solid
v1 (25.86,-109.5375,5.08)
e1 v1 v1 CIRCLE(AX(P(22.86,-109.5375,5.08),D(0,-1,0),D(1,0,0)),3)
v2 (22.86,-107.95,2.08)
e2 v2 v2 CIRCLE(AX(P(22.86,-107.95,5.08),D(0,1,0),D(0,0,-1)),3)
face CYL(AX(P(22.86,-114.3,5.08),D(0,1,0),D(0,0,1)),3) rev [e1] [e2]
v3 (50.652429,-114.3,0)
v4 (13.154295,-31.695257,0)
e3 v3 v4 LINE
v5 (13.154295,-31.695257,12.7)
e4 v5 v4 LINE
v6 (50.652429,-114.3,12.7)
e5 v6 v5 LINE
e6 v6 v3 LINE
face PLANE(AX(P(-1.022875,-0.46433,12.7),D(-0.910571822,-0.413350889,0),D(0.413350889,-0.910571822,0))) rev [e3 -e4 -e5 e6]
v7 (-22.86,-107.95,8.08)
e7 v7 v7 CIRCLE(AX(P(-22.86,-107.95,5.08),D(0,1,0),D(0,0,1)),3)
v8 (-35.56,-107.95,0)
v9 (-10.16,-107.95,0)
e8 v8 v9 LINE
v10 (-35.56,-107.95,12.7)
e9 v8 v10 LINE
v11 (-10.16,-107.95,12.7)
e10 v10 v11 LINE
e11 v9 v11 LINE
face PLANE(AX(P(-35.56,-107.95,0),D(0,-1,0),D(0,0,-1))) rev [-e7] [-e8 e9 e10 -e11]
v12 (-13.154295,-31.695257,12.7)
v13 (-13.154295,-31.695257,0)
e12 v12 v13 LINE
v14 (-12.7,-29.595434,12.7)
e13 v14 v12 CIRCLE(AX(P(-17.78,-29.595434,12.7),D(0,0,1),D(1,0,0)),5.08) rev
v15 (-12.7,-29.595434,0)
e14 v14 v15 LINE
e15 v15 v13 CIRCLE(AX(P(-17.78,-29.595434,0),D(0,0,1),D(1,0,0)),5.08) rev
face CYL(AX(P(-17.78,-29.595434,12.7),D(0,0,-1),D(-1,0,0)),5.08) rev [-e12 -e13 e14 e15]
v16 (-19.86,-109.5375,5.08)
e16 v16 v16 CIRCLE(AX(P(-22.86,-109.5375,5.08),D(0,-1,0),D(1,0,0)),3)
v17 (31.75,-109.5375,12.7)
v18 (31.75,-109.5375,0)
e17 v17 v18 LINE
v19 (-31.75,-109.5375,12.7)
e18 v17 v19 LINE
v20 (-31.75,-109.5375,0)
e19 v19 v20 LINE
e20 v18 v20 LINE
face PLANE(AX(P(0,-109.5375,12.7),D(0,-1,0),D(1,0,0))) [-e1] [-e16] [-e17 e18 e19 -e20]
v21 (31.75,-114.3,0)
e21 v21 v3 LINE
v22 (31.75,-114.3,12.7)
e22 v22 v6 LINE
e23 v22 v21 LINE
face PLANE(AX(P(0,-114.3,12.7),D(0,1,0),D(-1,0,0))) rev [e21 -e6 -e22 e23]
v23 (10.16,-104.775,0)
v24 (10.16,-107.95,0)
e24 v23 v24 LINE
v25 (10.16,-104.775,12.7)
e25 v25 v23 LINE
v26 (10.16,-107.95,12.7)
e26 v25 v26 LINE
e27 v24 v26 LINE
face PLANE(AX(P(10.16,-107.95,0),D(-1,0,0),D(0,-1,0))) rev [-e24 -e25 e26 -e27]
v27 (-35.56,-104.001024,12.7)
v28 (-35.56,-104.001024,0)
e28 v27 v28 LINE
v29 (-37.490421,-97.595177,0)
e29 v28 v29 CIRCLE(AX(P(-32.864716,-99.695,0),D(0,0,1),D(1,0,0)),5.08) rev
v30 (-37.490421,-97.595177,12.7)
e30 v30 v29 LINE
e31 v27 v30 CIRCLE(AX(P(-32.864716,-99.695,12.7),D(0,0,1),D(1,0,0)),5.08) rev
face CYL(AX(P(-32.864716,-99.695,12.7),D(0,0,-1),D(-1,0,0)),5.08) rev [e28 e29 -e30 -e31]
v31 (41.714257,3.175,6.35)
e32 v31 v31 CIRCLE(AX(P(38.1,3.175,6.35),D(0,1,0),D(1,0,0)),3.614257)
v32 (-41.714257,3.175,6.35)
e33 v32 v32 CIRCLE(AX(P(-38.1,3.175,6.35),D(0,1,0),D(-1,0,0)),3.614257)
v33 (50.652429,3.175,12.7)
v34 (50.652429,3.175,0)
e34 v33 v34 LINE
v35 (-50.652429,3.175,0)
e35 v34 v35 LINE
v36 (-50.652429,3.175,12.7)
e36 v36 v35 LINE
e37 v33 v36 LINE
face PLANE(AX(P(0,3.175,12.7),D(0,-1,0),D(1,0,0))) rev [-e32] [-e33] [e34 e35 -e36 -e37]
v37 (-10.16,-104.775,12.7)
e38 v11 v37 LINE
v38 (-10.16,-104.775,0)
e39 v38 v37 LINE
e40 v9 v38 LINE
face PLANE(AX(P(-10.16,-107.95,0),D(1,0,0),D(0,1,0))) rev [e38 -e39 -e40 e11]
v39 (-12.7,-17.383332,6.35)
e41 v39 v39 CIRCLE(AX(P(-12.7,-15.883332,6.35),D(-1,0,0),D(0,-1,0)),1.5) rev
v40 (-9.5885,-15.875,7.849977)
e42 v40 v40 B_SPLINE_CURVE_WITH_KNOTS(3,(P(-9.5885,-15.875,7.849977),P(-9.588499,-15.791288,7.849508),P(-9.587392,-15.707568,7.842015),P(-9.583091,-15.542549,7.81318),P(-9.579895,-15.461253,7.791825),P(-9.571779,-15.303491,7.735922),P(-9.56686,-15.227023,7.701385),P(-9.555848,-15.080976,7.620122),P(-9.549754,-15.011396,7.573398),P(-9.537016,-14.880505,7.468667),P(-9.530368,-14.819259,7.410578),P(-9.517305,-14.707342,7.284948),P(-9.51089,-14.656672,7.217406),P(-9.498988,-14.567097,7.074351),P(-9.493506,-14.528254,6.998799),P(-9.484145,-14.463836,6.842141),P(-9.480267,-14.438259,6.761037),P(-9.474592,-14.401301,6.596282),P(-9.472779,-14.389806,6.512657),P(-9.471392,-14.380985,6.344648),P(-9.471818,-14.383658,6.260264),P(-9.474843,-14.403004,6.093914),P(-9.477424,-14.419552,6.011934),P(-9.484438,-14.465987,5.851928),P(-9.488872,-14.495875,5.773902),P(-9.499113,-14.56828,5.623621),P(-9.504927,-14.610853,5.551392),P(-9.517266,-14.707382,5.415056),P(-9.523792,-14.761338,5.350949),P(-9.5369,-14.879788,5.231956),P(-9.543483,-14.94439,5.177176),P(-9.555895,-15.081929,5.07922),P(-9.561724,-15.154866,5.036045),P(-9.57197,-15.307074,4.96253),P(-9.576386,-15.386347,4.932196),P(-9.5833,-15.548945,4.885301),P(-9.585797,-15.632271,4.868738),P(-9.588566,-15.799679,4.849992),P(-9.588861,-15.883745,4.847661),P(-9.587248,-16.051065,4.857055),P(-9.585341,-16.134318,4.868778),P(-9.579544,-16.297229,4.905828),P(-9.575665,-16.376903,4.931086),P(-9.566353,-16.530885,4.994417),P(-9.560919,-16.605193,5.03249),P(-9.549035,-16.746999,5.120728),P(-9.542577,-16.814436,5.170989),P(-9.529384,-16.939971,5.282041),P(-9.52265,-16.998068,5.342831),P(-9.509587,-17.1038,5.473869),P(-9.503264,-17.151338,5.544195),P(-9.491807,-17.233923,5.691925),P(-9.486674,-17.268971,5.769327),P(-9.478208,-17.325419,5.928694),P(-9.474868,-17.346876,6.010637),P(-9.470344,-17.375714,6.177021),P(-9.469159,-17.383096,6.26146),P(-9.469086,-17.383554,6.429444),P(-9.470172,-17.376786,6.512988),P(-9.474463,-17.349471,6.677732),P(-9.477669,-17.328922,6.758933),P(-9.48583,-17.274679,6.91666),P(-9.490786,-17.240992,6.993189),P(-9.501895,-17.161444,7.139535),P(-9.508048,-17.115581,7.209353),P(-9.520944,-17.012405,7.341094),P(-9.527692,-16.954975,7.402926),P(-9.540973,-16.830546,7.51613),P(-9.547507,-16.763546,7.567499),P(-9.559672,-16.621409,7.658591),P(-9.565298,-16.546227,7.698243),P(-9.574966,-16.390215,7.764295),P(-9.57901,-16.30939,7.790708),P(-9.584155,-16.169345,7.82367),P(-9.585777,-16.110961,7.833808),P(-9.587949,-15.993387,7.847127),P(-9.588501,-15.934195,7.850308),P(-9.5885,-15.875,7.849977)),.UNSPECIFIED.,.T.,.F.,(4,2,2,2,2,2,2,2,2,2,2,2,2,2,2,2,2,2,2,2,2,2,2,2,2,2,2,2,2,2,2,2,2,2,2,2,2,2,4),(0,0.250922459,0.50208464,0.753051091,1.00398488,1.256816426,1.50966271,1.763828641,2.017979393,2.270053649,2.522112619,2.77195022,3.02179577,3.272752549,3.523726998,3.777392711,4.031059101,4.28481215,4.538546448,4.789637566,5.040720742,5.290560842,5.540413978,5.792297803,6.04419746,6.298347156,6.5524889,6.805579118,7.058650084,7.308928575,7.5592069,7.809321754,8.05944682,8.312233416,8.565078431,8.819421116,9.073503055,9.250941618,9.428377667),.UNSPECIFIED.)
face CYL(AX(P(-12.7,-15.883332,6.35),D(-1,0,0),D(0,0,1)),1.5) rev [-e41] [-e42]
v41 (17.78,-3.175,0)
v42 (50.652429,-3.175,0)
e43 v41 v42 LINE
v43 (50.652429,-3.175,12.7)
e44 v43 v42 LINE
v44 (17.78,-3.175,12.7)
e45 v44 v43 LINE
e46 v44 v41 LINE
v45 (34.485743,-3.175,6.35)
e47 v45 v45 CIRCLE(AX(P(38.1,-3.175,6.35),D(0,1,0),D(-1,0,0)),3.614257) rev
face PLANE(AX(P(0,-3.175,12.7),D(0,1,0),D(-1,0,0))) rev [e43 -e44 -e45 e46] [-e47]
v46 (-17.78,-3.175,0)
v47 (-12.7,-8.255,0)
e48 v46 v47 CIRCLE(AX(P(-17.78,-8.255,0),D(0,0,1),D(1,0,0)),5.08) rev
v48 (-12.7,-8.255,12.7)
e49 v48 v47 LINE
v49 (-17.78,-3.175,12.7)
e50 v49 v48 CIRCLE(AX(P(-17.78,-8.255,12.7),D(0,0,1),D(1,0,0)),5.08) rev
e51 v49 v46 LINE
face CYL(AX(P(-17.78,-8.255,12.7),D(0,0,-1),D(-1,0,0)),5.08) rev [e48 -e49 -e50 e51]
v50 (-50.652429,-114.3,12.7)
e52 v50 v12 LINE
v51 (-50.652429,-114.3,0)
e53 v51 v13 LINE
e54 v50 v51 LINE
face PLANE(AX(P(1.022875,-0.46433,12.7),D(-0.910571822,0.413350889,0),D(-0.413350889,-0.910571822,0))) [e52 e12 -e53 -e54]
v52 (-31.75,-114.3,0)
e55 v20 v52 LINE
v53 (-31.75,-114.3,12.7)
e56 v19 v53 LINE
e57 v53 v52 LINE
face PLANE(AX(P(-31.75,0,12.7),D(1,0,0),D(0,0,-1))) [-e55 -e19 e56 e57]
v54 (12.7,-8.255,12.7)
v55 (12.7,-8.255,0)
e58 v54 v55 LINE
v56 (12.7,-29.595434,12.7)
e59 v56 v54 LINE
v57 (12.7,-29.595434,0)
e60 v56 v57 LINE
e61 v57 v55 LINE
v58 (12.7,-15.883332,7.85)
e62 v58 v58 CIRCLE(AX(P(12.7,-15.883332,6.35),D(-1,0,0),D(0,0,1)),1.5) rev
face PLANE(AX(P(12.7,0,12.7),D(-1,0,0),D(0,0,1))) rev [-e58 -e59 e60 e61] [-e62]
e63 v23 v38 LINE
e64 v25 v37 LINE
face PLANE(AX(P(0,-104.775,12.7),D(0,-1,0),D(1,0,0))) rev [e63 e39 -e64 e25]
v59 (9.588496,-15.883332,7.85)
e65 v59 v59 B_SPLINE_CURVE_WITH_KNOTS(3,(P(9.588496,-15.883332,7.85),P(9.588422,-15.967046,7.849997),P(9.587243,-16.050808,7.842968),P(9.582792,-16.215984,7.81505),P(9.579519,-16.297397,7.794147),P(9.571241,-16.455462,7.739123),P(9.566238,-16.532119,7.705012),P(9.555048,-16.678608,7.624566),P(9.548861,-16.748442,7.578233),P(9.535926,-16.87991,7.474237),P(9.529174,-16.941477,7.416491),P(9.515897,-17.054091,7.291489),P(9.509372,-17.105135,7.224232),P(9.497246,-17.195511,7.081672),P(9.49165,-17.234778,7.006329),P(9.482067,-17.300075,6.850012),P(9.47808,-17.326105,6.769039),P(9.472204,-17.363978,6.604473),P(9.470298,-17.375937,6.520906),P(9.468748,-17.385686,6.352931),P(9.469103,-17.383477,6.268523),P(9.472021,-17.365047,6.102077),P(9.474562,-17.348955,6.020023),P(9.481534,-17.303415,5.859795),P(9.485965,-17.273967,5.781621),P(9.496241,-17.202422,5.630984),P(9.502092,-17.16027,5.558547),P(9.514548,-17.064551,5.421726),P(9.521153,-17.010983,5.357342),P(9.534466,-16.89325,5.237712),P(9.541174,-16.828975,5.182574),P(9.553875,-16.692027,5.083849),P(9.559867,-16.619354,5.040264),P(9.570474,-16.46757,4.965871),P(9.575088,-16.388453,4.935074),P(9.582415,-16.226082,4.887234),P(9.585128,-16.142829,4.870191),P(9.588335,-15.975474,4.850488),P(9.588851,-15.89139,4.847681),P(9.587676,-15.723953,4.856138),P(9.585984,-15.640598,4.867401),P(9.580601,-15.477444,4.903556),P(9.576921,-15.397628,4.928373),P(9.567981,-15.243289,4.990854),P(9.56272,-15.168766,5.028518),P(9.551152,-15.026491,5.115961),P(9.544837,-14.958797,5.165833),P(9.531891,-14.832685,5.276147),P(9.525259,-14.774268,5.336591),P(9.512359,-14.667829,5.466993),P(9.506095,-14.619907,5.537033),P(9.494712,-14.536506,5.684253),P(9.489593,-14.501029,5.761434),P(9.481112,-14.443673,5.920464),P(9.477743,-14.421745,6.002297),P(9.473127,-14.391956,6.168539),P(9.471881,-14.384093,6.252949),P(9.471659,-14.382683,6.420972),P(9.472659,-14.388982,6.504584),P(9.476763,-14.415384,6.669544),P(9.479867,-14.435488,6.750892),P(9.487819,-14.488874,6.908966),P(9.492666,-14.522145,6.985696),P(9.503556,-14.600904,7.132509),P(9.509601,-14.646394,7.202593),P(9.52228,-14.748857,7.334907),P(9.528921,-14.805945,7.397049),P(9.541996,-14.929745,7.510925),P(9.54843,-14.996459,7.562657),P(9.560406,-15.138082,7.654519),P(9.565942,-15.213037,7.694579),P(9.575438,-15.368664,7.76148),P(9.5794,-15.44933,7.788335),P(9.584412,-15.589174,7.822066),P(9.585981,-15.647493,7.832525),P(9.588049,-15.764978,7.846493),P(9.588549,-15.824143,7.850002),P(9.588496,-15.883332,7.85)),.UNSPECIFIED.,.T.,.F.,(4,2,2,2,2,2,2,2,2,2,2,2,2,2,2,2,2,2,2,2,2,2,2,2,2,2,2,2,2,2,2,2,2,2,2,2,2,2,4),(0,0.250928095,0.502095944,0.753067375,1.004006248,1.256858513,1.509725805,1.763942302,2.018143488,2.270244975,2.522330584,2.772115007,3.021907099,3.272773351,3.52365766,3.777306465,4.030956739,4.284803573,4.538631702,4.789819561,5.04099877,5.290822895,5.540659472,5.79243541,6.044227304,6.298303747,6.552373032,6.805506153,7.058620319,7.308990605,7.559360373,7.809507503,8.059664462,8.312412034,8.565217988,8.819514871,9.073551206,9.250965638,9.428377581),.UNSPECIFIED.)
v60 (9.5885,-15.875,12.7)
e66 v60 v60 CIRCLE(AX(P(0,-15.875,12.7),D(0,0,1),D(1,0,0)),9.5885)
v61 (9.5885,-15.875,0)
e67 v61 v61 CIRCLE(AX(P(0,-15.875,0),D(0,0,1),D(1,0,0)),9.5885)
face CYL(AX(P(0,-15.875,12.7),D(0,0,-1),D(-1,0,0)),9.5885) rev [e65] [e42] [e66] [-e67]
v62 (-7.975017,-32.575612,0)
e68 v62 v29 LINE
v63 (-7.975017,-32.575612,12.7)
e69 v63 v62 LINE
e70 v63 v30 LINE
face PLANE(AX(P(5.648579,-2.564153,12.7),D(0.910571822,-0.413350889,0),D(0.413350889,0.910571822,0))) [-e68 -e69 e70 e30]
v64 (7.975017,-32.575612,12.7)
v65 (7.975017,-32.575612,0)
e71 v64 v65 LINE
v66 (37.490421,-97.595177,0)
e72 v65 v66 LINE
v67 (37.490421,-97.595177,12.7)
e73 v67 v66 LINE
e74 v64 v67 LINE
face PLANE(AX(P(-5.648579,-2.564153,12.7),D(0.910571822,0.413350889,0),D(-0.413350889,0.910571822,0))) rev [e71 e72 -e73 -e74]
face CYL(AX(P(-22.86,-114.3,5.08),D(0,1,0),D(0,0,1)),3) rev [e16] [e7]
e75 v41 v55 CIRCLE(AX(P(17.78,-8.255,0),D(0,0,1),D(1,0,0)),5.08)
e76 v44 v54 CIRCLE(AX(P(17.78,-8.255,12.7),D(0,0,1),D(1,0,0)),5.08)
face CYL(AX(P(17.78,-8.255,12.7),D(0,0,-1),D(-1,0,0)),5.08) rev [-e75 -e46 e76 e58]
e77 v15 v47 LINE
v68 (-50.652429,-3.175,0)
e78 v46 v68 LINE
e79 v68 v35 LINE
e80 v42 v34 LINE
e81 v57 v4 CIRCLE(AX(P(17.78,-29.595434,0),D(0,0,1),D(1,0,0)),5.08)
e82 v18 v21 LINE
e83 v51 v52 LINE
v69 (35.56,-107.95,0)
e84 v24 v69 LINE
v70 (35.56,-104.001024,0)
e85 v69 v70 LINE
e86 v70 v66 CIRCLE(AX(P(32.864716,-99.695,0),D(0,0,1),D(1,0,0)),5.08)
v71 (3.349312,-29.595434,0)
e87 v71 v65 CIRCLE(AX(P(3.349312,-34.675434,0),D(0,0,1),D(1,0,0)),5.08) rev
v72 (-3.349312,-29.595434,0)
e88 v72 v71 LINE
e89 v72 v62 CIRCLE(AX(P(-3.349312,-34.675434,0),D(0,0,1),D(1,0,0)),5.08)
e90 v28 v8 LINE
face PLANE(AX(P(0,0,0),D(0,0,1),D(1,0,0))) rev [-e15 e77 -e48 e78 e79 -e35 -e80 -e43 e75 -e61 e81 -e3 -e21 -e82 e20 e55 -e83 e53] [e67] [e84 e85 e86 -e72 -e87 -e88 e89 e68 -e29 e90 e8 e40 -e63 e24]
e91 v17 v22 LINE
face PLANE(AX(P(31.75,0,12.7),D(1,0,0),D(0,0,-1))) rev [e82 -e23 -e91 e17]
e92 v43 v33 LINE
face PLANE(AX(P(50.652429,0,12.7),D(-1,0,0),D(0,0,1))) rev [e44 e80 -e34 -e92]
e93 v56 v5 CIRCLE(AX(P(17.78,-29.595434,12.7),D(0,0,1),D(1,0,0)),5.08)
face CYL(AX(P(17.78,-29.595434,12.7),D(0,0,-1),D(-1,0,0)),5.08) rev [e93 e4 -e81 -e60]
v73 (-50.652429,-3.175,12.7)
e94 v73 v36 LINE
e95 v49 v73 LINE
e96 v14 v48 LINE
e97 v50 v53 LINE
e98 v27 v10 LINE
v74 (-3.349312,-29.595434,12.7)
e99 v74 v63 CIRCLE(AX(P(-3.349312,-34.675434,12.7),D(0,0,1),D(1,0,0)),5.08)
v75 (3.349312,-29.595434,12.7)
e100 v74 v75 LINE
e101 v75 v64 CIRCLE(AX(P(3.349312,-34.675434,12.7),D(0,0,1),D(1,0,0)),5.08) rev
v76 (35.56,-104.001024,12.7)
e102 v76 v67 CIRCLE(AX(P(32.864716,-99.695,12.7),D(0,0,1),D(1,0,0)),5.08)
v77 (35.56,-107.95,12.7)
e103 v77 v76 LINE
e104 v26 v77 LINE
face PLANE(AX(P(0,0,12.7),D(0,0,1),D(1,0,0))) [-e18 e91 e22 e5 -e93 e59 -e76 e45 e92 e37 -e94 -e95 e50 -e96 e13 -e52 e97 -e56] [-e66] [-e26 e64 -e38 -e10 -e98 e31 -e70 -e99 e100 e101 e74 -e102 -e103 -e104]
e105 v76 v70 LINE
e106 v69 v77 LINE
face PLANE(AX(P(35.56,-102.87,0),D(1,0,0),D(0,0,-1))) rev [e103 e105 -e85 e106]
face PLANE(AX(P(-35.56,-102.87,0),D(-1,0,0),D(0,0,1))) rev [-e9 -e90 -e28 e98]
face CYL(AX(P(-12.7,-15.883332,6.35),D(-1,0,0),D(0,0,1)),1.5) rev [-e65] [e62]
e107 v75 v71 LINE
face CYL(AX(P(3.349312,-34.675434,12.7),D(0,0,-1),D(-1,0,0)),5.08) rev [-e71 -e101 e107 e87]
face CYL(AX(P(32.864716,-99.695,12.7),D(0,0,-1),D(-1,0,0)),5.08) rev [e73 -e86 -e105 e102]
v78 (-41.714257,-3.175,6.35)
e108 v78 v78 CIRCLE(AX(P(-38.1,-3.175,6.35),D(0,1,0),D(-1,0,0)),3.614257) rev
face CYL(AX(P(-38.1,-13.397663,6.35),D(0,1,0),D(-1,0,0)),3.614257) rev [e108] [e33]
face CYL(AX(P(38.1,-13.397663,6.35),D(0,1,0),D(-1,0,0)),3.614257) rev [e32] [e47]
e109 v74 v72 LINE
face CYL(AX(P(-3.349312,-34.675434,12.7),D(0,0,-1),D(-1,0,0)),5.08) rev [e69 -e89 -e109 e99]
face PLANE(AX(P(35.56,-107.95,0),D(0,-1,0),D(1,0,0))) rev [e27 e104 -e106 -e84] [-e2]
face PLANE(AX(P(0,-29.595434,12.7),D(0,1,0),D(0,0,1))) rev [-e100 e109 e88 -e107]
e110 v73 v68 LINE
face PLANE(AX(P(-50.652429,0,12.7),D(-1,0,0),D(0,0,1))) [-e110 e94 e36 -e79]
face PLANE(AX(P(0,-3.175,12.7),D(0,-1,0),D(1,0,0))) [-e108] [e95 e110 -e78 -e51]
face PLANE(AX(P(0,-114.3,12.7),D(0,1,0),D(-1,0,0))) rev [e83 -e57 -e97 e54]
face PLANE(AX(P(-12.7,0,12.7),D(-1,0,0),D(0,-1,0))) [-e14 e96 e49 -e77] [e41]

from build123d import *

# Parameters (mm, degrees)
SKETCH3_R               = 9.5885
BOSS_EXTRUDE1_DEPTH     = 12.7
SKETCH4_R               = 3.614257139
CUT_EXTRUDE1_DEPTH      = 6.35
CUT_EXTRUDE2_START      = -12.7
CUT_EXTRUDE2_OUTLINE_R  = 1.5
CUT_EXTRUDE2_DEPTH      = 25.4
CUT_EXTRUDE3_DEPTH      = 126.664030474
CUT_EXTRUDE3_DEPTH_BACK = 126.664030474
SKETCH8_W               = 25.4
SKETCH8_H               = 5.08
SKETCH9_R               = 3
CUT_EXTRUDE4_DEPTH      = 123.783240632


# Read off the part's stored shape, not the designer's step: Cut-Extrude2
with BuildPart() as part:
    # Sketch3 → Boss-Extrude1 (new body)
    with BuildSketch(Plane.XY):
        with BuildLine():
            Line((50.652428891, 3.175), (-50.652428891, 3.175))
            Line((-50.652428891, 3.175), (-50.652428891, -3.175))
            Line((-50.652428891, -3.175), (-17.78, -3.175))
            ThreePointArc((-17.78, -3.175), (-14.187897552, -4.662897552), (-12.7, -8.255))
            Line((-12.7, -8.255), (-12.7, -29.595434395))
            ThreePointArc((-12.7, -29.595434395), (-12.814872576, -30.66963627), (-13.154295145, -31.69525691))
            Line((-13.154295145, -31.69525691), (-50.652428891, -114.3))
            Line((-50.652428891, -114.3), (-31.75, -114.3))
            Line((-31.75, -114.3), (-31.75, -109.5375))
            Line((-31.75, -109.5375), (31.75, -109.5375))
            Line((31.75, -109.5375), (31.75, -114.3))
            Line((31.75, -114.3), (50.652428891, -114.3))
            Line((50.652428891, -114.3), (13.154295145, -31.69525691))
            ThreePointArc((13.154295145, -31.69525691), (12.814872576, -30.66963627), (12.7, -29.595434395))
            Line((12.7, -29.595434395), (12.7, -8.255))
            ThreePointArc((12.7, -8.255), (14.187897552, -4.662897552), (17.78, -3.175))
            Line((17.78, -3.175), (50.652428891, -3.175))
            Line((50.652428891, -3.175), (50.652428891, 3.175))
        make_face()
        with Locations((0, -15.875)):
            Circle(SKETCH3_R, mode=Mode.SUBTRACT)
        with BuildLine():
            Line((-7.97501727, -32.575611881), (-37.490421301, -97.595177486))
            ThreePointArc((-37.490421301, -97.595177486), (-37.135167146, -102.446299841), (-32.864716446, -104.775))
            Line((-32.864716446, -104.775), (0, -104.775))
            Line((0, -104.775), (32.864716446, -104.775))
            ThreePointArc((32.864716446, -104.775), (37.135167146, -102.446299841), (37.490421301, -97.595177486))
            Line((37.490421301, -97.595177486), (7.97501727, -32.575611881))
            ThreePointArc((7.97501727, -32.575611881), (6.100612256, -30.404983695), (3.349312415, -29.595434395))
            Line((3.349312415, -29.595434395), (-3.349312415, -29.595434395))
            ThreePointArc((-3.349312415, -29.595434395), (-6.100612256, -30.404983695), (-7.97501727, -32.575611881))
        make_face(mode=Mode.SUBTRACT)
    extrude(amount=BOSS_EXTRUDE1_DEPTH)

    # Sketch4 → Cut-Extrude1 (cut)
    with BuildSketch(Plane(origin=(0, 3.175, 0), x_dir=(1, 0, 0), z_dir=(0, 1, 0))):
        with Locations(Location((-38.1, -6.35, 0), (0, 0, 180))):
            Circle(SKETCH4_R)
        with Locations(Location((38.1, -6.35, 0), (0, 0, 180))):
            Circle(SKETCH4_R)
    extrude(amount=-CUT_EXTRUDE1_DEPTH, mode=Mode.SUBTRACT)

    # Cut-Extrude2 outline → Cut-Extrude2 (cut)
    with BuildSketch(Plane.YZ.offset(CUT_EXTRUDE2_START)):
        with Locations((-15.883331584, 6.35)):
            Circle(CUT_EXTRUDE2_OUTLINE_R)
    extrude(amount=CUT_EXTRUDE2_DEPTH, mode=Mode.SUBTRACT)

    # Sketch8 → Cut-Extrude3 (cut, two sides: drawn at the far end of the back side and taken through both)
    with BuildSketch(Plane.XY.offset(12.7).offset(-CUT_EXTRUDE3_DEPTH_BACK)):
        with Locations((-22.86, -105.41)):
            Rectangle(SKETCH8_W, SKETCH8_H)
        with Locations((22.86, -105.41)):
            Rectangle(SKETCH8_W, SKETCH8_H)
    extrude(amount=CUT_EXTRUDE3_DEPTH + CUT_EXTRUDE3_DEPTH_BACK, mode=Mode.SUBTRACT)

    # Sketch9 → Cut-Extrude4 (cut, through all)
    with BuildSketch(Plane(origin=(0, -107.95, 0), x_dir=(1, 0, 0), z_dir=(0, 1, 0))):
        with Locations(Location((-22.86, -5.08, 0), (0, 0, 270))):
            Circle(SKETCH9_R)
        with Locations((22.86, -5.08)):
            Circle(SKETCH9_R)
    extrude(amount=-CUT_EXTRUDE4_DEPTH, mode=Mode.SUBTRACT)


solid = part.part
